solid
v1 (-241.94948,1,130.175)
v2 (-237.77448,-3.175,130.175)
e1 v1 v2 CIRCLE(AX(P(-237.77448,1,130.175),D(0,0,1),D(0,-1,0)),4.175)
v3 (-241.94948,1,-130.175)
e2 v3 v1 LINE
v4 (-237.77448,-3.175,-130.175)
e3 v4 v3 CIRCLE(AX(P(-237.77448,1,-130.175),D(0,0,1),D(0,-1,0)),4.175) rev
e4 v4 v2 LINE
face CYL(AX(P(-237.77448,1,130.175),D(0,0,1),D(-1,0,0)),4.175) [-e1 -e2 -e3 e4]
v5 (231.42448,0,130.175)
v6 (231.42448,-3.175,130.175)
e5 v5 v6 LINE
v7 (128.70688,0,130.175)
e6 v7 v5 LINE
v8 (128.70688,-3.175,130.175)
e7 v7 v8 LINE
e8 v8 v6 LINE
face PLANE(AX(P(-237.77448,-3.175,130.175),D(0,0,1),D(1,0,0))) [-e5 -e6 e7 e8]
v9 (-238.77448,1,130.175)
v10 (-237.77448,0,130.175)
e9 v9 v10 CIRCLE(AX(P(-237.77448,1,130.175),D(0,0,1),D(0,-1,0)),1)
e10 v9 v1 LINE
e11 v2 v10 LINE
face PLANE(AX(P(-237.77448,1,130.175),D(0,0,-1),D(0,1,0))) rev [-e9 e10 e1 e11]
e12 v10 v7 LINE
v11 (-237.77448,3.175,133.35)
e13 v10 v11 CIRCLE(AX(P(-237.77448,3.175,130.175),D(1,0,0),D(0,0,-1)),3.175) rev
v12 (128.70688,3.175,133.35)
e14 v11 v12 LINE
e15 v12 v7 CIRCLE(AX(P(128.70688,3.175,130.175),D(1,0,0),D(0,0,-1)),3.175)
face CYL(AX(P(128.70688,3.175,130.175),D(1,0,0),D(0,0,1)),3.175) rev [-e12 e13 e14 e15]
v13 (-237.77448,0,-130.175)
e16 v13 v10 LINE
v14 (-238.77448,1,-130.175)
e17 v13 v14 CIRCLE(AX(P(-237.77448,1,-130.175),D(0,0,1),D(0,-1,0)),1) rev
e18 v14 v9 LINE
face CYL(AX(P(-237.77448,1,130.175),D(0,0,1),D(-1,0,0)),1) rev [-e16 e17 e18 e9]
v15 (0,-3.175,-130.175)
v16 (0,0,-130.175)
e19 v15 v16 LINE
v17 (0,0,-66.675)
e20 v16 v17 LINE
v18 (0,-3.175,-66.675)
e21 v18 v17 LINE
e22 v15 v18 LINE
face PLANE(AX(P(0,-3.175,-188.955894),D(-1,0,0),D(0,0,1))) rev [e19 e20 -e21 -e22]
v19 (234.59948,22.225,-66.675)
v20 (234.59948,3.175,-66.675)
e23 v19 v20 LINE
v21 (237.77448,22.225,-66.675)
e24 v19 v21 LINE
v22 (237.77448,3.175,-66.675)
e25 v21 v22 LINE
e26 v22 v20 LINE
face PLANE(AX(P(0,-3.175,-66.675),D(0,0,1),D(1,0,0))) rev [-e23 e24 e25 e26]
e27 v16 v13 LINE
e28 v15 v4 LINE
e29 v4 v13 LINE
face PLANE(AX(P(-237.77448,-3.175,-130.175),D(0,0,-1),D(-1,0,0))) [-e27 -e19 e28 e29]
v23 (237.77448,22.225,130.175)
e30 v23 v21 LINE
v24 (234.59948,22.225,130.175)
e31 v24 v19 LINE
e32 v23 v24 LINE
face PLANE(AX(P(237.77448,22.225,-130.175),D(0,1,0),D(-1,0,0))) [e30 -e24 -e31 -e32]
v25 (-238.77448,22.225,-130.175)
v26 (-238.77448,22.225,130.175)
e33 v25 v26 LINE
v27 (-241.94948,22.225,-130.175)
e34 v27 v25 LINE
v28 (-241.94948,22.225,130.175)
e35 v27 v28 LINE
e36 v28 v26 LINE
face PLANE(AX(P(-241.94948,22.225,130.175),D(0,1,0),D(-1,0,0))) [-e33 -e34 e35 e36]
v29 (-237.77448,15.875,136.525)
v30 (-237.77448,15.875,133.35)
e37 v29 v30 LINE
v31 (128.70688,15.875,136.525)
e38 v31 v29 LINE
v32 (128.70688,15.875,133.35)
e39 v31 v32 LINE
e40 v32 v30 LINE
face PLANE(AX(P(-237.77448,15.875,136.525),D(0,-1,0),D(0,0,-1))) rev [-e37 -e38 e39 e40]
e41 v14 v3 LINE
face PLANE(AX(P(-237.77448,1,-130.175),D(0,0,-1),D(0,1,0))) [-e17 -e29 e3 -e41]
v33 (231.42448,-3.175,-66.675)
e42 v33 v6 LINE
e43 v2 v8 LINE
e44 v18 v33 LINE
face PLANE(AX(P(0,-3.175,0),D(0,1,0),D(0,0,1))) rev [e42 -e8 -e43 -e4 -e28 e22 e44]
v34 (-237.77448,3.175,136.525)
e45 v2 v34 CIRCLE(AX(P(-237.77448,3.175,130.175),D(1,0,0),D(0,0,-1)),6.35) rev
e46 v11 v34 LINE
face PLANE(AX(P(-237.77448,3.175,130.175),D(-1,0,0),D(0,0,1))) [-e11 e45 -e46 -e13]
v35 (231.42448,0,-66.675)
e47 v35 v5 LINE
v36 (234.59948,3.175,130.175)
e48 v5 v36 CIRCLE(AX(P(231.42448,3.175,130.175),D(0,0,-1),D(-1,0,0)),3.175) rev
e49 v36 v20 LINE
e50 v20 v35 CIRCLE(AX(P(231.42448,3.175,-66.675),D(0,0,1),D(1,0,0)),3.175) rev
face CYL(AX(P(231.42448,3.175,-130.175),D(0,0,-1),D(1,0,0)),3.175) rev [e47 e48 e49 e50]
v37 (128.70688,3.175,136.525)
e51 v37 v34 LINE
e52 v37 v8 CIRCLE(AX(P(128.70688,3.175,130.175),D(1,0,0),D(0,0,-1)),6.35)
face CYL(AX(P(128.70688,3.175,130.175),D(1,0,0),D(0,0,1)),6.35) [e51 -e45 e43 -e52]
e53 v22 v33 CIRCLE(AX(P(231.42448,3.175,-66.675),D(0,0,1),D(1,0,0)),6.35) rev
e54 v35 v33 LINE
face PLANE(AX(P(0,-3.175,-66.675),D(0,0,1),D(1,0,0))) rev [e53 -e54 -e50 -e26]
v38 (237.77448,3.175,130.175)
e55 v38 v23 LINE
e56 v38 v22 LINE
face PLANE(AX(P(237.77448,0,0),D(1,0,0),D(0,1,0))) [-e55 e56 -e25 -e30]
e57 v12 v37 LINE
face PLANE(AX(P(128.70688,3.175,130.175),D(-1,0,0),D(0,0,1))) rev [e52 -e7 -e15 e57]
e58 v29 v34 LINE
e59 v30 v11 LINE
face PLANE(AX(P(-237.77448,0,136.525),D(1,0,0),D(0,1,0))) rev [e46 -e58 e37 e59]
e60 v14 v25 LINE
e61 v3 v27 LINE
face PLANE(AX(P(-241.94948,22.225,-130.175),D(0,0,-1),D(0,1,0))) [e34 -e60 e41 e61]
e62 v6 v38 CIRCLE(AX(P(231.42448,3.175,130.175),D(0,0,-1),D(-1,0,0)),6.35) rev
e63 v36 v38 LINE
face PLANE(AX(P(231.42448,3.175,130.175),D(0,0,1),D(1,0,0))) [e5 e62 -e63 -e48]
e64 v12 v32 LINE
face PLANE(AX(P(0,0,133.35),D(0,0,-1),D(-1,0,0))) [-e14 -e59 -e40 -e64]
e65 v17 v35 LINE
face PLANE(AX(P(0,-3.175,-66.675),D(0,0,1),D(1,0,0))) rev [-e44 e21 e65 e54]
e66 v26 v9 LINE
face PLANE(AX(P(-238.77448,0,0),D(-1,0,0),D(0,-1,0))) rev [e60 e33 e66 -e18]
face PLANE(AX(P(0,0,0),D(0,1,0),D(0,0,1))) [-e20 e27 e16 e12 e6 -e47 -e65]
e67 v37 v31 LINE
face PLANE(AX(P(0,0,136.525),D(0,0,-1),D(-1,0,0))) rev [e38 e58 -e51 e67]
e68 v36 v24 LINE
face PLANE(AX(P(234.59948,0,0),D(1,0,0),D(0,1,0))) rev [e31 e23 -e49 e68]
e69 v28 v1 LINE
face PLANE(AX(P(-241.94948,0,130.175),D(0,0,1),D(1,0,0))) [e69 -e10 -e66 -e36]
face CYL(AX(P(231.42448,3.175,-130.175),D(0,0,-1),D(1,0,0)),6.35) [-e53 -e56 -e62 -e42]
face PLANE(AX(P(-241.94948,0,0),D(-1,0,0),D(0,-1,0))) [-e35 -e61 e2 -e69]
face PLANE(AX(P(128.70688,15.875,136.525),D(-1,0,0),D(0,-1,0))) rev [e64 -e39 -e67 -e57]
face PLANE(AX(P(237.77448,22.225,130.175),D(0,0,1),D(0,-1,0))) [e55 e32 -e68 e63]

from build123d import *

# Parameters (mm, degrees)
SKETCH5_W                    = 475.54896
SKETCH5_H                    = 260.35
BASE_FLANGE1_DEPTH           = 3.175
EDGE_FLANGE1_DEPTH           = 366.48136
EDGE_FLANGE2_STRIP_W         = 19.05
EDGE_FLANGE2_STRIP_H         = 3.175
EDGE_FLANGE2_STRIP_CUT_DEPTH = 260.35
EDGE_FLANGE2_DEPTH           = 260.35
EDGE_FLANGE3_DEPTH           = 260.35
CUT_EXTRUDE1_DEPTH           = 279.698003441
CUT_EXTRUDE1_DEPTH_BACK      = 279.698003441
SKETCH16_W                   = 336.938395151
SKETCH16_H                   = 122.280894257


# Sheet-metal steps are written as plain solids
with BuildPart() as part:
    # Sketch5 → Base-Flange1 (new body)
    with BuildSketch(Plane(origin=(0, 0, 0), x_dir=(1, 0, 0), z_dir=(0, 1, 0))):
        Rectangle(SKETCH5_W, SKETCH5_H)
    extrude(amount=-BASE_FLANGE1_DEPTH)

    # Edge-Flange1 section (across the edge) → Edge-Flange1 (add)
    with BuildSketch(Plane(origin=(-237.77448, 0, 133.35), x_dir=(0, 0, -1), z_dir=(1, 0, 0))):
        with BuildLine():
            Line((-3.175, 3.175), (-3.175, 15.875))
            Line((-3.175, 15.875), (0, 15.875))
            Line((0, 15.875), (0, 3.175))
            ThreePointArc((0, 3.175), (0.92993597, 0.92993597), (3.175, 0))
            Line((3.175, 0), (3.175, -3.175))
            ThreePointArc((3.175, -3.175), (-1.315128061, -1.315128061), (-3.175, 3.175))
        make_face()
    extrude(amount=EDGE_FLANGE1_DEPTH)

    # Edge-Flange2 strip (across the edge) → Edge-Flange2 strip cut (cut)
    with BuildSketch(Plane(origin=(237.77448, 0, 130.175), x_dir=(-1, 0, 0), z_dir=(0, 0, -1))):
        with Locations((-3.175, -1.5875)):
            Rectangle(EDGE_FLANGE2_STRIP_W, EDGE_FLANGE2_STRIP_H)
    extrude(amount=EDGE_FLANGE2_STRIP_CUT_DEPTH, mode=Mode.SUBTRACT)

    # Edge-Flange2 section (across the edge) → Edge-Flange2 (add)
    with BuildSketch(Plane(origin=(237.77448, 0, 130.175), x_dir=(-1, 0, 0), z_dir=(0, 0, -1))):
        with BuildLine():
            Line((0, 3.175), (0, 22.225))
            Line((0, 22.225), (3.175, 22.225))
            Line((3.175, 22.225), (3.175, 3.175))
            ThreePointArc((3.175, 3.175), (4.10493597, 0.92993597), (6.35, 0))
            Line((6.35, 0), (6.35, -3.175))
            ThreePointArc((6.35, -3.175), (1.859871939, -1.315128061), (0, 3.175))
        make_face()
    extrude(amount=EDGE_FLANGE2_DEPTH)

    # Edge-Flange3 section (across the edge) → Edge-Flange3 (add)
    with BuildSketch(Plane(origin=(-238.77448, 0, -130.175), x_dir=(1, 0, 0), z_dir=(0, 0, 1))):
        with BuildLine():
            Line((-3.175, 1), (-3.175, 22.225))
            Line((-3.175, 22.225), (0, 22.225))
            Line((0, 22.225), (0, 1))
            ThreePointArc((0, 1), (0.292893219, 0.292893219), (1, 0))
            Line((1, 0), (1, -3.175))
            ThreePointArc((1, -3.175), (-1.952170811, -1.952170811), (-3.175, 1))
        make_face()
    extrude(amount=EDGE_FLANGE3_DEPTH)

    # Sketch16 → Cut-Extrude1 (cut, two sides: drawn at the far end of the back side and taken through both)
    with BuildSketch(Plane(origin=(0, 0, 0), x_dir=(1, 0, 0), z_dir=(0, 1, 0)).offset(-CUT_EXTRUDE1_DEPTH_BACK)):
        with Locations((168.469197576, 127.815447129)):
            Rectangle(SKETCH16_W, SKETCH16_H)
    extrude(amount=CUT_EXTRUDE1_DEPTH + CUT_EXTRUDE1_DEPTH_BACK, mode=Mode.SUBTRACT)


solid = part.part
